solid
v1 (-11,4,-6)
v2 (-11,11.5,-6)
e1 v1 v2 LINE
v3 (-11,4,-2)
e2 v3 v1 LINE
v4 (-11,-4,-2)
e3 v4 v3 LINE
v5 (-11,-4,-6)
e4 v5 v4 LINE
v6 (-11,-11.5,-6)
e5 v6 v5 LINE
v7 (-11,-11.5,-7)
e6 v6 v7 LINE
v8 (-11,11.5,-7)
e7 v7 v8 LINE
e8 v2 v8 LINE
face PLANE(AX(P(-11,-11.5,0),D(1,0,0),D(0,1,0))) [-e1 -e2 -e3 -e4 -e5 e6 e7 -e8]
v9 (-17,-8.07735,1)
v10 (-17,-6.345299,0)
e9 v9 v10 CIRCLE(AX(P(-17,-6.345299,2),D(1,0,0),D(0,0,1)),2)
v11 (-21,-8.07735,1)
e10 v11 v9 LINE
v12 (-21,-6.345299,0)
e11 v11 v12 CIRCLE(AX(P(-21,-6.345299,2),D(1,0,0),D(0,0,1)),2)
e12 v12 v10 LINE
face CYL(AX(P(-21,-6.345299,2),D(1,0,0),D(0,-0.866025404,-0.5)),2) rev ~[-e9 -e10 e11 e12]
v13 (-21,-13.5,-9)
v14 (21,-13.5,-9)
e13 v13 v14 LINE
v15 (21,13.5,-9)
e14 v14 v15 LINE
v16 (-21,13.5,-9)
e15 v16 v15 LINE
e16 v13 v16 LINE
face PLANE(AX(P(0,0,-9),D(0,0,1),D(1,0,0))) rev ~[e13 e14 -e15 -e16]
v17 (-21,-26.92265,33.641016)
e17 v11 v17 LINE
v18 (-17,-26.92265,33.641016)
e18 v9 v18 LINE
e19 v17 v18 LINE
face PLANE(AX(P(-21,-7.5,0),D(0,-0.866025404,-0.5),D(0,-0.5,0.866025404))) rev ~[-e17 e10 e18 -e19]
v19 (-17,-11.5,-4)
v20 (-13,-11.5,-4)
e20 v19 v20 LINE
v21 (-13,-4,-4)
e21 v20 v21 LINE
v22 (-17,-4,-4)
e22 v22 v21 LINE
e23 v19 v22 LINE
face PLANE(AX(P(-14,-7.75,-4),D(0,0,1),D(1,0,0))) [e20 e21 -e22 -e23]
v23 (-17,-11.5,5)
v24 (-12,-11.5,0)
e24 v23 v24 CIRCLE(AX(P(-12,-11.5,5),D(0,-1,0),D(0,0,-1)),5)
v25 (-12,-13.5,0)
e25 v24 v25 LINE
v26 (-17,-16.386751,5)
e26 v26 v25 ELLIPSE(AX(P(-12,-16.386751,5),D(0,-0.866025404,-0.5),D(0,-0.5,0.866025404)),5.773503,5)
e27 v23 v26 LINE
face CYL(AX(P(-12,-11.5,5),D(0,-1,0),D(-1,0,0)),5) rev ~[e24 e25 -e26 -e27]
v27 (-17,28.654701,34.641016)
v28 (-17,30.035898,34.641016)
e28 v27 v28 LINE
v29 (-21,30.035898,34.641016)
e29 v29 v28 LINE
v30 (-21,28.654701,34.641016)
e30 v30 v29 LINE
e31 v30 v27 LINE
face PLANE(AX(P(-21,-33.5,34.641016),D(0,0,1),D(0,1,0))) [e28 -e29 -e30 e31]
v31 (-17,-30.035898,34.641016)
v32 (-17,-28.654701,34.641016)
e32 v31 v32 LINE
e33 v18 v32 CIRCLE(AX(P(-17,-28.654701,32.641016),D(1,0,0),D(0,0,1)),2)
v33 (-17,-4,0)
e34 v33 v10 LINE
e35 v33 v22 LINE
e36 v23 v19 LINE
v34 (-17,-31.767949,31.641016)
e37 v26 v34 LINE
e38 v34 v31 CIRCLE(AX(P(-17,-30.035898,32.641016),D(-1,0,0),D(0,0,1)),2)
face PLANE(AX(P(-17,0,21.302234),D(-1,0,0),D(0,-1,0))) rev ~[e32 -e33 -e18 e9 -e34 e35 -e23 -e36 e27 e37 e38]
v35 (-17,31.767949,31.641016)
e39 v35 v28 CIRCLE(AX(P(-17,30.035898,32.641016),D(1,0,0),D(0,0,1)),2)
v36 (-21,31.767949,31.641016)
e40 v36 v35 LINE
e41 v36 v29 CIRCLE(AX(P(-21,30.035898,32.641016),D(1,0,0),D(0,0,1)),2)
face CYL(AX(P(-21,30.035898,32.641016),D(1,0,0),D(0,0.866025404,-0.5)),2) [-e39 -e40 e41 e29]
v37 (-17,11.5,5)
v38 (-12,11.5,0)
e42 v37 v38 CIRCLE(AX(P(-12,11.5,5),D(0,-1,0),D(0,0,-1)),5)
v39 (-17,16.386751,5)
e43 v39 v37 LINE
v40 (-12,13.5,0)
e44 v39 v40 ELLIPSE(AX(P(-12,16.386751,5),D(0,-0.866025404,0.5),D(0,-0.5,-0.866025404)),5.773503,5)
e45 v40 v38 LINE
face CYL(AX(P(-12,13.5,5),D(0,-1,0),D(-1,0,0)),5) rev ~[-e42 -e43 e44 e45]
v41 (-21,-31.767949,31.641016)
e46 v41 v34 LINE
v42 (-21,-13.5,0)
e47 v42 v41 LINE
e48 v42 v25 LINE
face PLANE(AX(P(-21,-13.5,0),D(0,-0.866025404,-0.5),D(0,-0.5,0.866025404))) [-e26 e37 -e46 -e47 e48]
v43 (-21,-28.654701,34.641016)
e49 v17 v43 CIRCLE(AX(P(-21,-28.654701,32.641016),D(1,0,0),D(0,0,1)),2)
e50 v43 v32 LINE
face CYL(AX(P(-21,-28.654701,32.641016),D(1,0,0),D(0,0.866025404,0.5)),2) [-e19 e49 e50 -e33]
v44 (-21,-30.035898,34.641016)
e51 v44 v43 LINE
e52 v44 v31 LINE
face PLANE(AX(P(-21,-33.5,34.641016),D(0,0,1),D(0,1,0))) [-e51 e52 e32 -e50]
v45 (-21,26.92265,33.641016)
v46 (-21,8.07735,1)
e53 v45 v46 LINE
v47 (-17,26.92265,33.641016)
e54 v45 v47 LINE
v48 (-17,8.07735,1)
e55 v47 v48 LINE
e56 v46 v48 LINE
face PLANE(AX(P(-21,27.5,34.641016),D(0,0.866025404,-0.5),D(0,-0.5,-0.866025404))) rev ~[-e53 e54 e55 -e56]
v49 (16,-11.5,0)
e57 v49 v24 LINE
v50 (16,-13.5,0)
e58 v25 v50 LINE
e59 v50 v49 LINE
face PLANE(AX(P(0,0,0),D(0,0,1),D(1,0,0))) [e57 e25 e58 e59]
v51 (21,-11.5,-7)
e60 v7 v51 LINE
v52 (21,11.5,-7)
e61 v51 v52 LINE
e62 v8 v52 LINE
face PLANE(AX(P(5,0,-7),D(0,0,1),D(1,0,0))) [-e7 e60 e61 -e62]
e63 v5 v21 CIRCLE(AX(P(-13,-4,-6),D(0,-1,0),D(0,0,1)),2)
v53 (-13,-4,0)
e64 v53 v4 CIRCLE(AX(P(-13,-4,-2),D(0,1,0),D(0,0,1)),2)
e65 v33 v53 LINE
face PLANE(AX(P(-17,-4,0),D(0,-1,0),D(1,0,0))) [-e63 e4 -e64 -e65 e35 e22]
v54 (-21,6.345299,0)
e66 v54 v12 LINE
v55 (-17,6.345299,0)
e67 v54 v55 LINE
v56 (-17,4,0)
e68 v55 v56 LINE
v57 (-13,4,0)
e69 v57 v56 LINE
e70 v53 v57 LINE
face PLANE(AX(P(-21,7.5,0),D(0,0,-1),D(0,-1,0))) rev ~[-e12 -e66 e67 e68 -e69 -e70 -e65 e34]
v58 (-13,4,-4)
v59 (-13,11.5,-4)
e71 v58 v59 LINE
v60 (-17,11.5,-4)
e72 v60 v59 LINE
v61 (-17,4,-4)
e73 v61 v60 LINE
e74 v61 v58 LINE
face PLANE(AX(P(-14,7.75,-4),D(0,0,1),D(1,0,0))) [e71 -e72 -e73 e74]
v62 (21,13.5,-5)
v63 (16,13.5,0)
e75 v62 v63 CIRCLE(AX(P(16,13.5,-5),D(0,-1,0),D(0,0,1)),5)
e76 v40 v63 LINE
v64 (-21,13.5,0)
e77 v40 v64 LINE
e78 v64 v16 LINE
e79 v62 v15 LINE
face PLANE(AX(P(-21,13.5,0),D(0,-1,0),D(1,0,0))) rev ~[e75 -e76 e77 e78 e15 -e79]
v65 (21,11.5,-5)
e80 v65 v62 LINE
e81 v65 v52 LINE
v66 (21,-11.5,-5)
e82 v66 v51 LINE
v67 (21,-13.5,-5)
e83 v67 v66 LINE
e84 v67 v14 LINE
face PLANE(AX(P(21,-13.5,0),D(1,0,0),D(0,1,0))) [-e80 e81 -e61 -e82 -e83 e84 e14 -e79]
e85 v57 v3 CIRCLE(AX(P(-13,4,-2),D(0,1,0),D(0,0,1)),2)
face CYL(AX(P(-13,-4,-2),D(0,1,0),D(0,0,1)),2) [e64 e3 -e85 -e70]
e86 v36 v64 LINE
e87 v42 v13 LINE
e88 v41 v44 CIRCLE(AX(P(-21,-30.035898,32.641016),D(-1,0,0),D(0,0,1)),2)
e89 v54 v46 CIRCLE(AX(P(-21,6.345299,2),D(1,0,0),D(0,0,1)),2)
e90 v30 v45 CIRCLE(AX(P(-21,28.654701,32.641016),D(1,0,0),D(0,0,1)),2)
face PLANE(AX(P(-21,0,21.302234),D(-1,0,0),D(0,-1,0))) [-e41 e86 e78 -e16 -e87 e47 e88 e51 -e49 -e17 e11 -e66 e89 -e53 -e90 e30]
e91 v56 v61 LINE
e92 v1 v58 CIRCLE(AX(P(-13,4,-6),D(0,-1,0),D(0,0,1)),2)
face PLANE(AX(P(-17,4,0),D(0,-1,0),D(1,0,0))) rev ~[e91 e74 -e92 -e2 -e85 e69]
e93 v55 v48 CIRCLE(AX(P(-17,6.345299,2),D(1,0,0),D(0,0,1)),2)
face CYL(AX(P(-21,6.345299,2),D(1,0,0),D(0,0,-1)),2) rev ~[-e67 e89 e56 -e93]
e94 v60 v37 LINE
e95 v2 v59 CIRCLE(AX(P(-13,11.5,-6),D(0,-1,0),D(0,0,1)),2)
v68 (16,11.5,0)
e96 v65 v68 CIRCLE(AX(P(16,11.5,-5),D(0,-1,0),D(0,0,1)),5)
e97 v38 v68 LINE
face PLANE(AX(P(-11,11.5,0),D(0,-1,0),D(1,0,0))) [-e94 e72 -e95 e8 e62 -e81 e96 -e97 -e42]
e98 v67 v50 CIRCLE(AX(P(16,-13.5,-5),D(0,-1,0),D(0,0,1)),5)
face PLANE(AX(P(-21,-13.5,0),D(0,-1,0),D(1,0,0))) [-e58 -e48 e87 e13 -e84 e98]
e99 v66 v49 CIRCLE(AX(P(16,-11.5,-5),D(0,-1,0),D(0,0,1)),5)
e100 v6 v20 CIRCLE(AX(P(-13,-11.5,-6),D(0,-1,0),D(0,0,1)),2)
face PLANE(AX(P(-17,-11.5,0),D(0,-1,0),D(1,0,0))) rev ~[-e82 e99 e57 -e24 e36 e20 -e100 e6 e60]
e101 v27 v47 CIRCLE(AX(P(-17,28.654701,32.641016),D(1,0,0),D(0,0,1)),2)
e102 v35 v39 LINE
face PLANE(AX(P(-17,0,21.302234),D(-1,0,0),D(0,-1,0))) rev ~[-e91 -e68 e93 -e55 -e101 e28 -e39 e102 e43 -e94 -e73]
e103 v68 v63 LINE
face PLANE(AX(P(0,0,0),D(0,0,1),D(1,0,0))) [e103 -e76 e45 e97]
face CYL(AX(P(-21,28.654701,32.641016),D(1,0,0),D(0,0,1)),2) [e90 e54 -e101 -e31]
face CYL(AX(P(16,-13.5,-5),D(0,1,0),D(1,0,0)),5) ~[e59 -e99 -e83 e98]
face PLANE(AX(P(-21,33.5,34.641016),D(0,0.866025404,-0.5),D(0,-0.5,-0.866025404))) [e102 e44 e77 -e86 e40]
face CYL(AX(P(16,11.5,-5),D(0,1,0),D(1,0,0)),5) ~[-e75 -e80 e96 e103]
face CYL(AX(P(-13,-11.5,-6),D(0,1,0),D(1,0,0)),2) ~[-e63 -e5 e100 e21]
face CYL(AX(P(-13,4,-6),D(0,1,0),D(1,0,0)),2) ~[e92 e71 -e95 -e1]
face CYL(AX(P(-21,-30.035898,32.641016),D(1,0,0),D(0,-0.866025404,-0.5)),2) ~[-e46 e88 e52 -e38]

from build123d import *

# Parameters (mm, degrees)
F0_W      = 42
F0_H      = 27
F1_DEPTH  = 9
F2_W      = 32
F2_H      = 23
F3_DEPTH  = 7
F6_W      = 6
F6_H      = 7.5
F7_DEPTH  = 4
F5_W      = 6
F5_H      = 7.5
F10_DEPTH = 4
F12_DEPTH = 5
F14_R     = 2
F15_R     = 5


with BuildPart() as f1:
    # F0 (on Top) → F1 (new body)
    with BuildSketch(Plane.XY):
        Rectangle(F0_W, F0_H)
    extrude(amount=-F1_DEPTH)


with BuildPart() as f3:
    # F2 (on Top) → F3 (new body)
    with BuildSketch(Plane.XY):
        with Locations((5, 0)):
            Rectangle(F2_W, F2_H)
    extrude(amount=-F3_DEPTH)


with BuildPart() as f1_1:
    add(f1.part)

    # F4: cut F3
    add(f3.part, mode=Mode.SUBTRACT)


with BuildPart() as f7:
    # F6 (on Top) → F7 (new body)
    with BuildSketch(Plane.XY):
        with Locations((-14, -7.75)):
            Rectangle(F6_W, F6_H)
    extrude(amount=-F7_DEPTH)


with BuildPart() as f7b:
    # F5 (on Top) → F7, piece 2 (new body)
    with BuildSketch(Plane.XY):
        with Locations((-14, 7.75)):
            Rectangle(F5_W, F5_H)
    extrude(amount=-F7_DEPTH)


with BuildPart() as f1_2:
    add(f1_1.part)

    # F8: cut F7b, F7
    add(f7b.part, mode=Mode.SUBTRACT)
    add(f7.part, mode=Mode.SUBTRACT)

    # F9 (on face) → F10 (join)
    with BuildSketch(Plane(origin=(-21, 0, 0), x_dir=(0, -1, 0), z_dir=(-1, 0, 0))):
        Polygon((-13.5, 0), (13.5, 0), (33.5, 34.6410161514), (-33.5, 34.6410161514), align=None)
    extrude(amount=-F10_DEPTH)


with BuildPart() as f12:
    # F11 (on face) → F12 (new body)
    with BuildSketch(Plane(origin=(-21, 0, 0), x_dir=(0, -1, 0), z_dir=(-1, 0, 0))):
        Polygon((-7.5, 0), (7.5, 0), (27.5, 34.6410161514), (-27.5, 34.6410161514), align=None)
    extrude(amount=-F12_DEPTH)


with BuildPart() as f1_3:
    add(f1_2.part)

    # F13: cut F12
    add(f12.part, mode=Mode.SUBTRACT)

    # F14
    f14_edges = [f1_3.edges().sort_by_distance(p)[0] for p in [
        (-19, 33.5, 34.641016),
        (-19, 27.5, 34.641016),
        (-19, -27.5, 34.641016),
        (-19, -33.5, 34.641016),
        (-19, -7.5, 0),
        (-19, 7.5, 0),
        (-11, 0, 0),
        (-11, 7.75, -4),
        (-11, -7.75, -4),
    ]]
    fillet(f14_edges, radius=F14_R)

    # F15
    f15_edges = [f1_3.edges().sort_by_distance(p)[0] for p in [
        (-17, -12.5, 0),
        (-17, 12.5, 0),
        (21, 12.5, 0),
        (21, -12.5, 0),
    ]]
    fillet(f15_edges, radius=F15_R)


solid = f1_3.part
